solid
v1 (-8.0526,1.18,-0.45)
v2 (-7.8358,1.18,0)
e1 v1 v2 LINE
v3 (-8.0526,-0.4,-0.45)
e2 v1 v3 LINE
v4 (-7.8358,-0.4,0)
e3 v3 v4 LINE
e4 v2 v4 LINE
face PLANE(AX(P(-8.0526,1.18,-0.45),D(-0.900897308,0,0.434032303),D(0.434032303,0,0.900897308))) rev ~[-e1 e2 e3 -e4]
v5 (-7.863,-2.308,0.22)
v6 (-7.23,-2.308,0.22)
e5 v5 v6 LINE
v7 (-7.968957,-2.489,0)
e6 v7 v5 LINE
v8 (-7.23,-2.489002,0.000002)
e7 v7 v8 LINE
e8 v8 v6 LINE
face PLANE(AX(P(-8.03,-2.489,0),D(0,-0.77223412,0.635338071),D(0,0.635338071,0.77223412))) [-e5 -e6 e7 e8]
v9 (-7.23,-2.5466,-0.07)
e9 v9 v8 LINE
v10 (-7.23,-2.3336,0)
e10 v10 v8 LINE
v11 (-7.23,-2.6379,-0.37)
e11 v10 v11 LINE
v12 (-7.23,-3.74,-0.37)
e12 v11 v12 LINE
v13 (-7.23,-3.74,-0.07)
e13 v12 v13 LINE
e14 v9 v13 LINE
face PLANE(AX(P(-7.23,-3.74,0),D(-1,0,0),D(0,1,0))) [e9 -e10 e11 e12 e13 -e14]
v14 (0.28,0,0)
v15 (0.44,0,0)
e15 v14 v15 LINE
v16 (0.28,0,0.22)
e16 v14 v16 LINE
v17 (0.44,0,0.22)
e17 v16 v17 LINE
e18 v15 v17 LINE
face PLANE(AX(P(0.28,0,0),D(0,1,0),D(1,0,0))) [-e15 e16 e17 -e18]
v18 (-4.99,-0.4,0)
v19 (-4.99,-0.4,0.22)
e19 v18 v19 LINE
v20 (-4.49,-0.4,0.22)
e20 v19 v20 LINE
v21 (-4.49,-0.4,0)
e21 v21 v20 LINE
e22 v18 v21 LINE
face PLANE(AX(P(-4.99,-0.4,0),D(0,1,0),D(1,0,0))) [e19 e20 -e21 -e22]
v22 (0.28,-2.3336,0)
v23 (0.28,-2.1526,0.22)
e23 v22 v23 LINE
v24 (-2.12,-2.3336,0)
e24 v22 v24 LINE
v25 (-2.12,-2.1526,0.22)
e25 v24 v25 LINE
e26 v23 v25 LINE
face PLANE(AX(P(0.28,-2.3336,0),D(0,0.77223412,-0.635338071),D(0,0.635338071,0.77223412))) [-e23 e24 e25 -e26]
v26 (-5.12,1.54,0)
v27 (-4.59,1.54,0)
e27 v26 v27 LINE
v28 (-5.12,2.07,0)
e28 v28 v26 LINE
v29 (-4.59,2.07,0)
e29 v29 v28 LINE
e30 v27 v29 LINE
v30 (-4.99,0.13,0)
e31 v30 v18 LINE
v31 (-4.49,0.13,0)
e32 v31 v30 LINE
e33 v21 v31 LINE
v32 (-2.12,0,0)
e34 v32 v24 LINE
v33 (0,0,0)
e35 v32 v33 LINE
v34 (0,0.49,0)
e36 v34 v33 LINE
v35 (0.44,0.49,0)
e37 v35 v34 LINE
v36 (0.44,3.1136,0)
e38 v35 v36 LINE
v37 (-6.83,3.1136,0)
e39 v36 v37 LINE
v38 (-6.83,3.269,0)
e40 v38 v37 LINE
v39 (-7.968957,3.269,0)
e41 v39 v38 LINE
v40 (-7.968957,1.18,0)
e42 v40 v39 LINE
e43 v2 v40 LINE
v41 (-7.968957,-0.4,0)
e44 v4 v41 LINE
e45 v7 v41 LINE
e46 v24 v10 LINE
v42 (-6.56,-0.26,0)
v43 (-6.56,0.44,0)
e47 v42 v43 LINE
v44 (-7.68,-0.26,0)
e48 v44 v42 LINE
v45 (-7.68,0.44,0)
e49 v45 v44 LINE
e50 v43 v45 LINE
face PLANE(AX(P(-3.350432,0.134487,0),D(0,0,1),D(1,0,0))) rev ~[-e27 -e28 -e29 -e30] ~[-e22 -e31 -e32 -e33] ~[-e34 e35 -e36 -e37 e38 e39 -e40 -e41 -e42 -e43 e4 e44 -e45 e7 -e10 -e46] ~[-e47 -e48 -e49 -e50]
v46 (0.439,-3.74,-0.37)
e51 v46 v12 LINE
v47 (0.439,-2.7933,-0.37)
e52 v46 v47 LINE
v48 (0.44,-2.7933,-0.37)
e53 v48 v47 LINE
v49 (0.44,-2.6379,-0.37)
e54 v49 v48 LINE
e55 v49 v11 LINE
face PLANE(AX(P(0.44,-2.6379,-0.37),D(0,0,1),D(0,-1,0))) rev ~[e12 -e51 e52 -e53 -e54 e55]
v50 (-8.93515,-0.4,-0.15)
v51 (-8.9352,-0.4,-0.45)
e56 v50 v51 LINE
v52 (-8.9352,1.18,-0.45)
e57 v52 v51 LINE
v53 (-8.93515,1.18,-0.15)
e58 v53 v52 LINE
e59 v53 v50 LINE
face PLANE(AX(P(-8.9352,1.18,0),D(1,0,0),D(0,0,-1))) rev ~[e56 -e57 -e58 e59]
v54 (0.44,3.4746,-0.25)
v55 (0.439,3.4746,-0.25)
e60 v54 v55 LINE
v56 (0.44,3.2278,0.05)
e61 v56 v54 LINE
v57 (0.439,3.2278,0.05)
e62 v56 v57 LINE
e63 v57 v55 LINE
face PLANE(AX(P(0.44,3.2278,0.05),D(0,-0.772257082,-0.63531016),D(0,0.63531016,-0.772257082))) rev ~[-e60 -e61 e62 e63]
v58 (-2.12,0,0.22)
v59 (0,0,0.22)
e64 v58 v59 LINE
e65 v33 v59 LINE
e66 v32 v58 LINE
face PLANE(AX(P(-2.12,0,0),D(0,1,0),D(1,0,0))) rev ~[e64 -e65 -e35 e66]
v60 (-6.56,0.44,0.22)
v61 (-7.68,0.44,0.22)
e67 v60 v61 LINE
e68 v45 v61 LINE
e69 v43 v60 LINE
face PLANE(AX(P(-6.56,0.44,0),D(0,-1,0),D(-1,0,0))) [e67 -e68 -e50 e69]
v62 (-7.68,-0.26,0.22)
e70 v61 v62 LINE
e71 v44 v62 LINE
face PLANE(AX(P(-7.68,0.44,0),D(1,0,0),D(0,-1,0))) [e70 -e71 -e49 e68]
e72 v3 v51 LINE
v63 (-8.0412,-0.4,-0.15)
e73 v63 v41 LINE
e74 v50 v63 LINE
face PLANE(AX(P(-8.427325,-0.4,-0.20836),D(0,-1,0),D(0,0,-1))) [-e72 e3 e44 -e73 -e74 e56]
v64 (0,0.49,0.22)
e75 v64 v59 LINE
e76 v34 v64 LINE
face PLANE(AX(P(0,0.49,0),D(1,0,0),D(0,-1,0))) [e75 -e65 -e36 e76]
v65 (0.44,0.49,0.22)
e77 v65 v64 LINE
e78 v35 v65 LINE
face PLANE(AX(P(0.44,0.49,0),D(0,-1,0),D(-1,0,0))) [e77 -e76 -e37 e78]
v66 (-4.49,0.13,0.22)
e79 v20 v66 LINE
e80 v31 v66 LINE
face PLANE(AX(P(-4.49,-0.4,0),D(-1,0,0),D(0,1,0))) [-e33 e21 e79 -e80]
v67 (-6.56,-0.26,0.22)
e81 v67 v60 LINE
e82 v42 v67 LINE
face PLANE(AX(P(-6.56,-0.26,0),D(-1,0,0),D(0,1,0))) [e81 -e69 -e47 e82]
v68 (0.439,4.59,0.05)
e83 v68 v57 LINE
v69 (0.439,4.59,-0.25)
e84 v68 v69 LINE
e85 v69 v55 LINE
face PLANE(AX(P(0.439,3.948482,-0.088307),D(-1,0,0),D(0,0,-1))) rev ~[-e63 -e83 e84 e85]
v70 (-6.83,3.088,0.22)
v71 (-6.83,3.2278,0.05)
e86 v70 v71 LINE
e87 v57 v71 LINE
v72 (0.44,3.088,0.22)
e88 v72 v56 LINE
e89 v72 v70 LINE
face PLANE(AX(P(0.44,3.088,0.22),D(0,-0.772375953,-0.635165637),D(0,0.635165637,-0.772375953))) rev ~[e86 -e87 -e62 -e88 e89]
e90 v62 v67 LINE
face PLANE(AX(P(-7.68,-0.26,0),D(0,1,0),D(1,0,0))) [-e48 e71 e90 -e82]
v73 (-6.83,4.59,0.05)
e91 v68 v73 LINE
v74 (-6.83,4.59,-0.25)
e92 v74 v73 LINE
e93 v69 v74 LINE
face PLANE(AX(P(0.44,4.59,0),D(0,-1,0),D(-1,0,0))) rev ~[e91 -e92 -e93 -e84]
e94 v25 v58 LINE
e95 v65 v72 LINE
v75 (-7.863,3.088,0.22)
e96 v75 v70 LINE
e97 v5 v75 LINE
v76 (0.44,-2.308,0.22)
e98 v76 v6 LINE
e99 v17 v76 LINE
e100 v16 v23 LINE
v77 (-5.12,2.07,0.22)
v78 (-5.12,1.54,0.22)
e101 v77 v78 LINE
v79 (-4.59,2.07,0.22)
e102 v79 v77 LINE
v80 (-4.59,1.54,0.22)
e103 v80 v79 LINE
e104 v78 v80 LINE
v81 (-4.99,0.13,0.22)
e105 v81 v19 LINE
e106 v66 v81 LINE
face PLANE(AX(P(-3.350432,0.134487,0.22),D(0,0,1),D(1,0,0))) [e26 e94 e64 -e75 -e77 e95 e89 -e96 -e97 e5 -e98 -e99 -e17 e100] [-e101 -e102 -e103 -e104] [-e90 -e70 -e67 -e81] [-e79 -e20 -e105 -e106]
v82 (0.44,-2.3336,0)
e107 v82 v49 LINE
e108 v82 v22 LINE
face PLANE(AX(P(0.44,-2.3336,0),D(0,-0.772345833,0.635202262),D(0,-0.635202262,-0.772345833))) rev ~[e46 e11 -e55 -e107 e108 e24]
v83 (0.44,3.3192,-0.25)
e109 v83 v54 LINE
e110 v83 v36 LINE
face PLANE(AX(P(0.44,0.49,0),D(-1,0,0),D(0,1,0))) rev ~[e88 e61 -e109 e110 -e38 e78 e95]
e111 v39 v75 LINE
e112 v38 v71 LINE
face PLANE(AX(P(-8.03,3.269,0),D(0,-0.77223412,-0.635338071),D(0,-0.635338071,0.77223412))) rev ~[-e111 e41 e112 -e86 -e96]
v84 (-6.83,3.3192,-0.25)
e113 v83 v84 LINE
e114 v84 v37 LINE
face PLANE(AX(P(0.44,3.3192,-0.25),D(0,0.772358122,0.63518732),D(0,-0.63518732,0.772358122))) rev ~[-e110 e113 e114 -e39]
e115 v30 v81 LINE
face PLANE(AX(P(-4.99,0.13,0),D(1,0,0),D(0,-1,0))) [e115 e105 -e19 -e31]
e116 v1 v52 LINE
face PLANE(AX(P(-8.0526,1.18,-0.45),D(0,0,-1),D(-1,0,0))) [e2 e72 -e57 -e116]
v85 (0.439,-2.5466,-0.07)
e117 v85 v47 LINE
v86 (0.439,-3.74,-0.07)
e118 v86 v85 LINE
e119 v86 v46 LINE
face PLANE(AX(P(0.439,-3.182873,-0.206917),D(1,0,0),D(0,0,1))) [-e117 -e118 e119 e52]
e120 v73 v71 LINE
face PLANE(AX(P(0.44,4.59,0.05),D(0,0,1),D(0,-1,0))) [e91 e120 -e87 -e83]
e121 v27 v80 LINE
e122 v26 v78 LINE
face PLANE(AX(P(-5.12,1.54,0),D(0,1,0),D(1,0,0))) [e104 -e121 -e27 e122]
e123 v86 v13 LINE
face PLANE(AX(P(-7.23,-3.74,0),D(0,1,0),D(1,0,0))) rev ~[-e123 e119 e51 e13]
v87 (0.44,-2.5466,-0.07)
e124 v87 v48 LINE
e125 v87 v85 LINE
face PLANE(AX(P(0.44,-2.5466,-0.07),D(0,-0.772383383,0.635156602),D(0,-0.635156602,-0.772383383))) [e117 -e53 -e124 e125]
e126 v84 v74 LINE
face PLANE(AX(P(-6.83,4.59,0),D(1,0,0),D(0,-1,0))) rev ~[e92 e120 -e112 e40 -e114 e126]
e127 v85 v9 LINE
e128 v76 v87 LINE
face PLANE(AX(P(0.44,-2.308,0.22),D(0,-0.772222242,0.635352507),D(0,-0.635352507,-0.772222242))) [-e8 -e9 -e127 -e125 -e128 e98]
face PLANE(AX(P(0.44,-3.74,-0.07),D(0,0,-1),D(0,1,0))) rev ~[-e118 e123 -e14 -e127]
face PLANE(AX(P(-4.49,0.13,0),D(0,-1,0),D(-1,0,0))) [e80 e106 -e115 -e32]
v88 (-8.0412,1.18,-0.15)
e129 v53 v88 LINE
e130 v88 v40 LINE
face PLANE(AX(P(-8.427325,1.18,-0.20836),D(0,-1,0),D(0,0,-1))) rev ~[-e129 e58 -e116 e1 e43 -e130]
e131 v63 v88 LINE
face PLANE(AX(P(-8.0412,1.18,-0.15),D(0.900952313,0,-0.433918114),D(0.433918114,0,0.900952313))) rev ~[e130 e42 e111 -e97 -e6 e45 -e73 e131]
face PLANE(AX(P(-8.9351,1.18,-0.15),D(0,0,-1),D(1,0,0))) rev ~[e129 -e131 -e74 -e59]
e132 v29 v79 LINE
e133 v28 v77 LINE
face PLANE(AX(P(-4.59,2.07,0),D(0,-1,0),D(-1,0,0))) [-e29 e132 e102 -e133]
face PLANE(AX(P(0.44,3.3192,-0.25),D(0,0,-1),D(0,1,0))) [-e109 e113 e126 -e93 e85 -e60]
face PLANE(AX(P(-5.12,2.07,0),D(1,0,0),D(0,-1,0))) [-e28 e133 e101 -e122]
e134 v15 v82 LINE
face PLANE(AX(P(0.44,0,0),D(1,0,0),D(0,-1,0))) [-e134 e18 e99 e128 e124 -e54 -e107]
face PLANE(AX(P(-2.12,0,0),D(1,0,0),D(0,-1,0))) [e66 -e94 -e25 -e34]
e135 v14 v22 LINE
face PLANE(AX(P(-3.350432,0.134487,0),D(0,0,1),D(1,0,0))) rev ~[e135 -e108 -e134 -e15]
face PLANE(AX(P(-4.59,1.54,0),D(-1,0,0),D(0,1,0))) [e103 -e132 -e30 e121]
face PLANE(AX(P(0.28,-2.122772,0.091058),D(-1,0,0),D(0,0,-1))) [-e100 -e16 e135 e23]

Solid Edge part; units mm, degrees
sketch "Sketch1" plane through (0, 0, 0) normal (0, 0, 1) x (1, 0, 0)
  line L0 (-5.12, 2.07) -> (-5.12, 1.54)
  line L1 (-5.12, 1.54) -> (-4.59, 1.54)
  line L2 (-4.59, 1.54) -> (-4.59, 2.07)
  line L3 (-4.59, 2.07) -> (-5.12, 2.07)
  line L4 (-4.49, 0.13) -> (-4.99, 0.13)
  line L5 (-4.99, 0.13) -> (-4.99, -0.4)
  line L6 (-4.99, -0.4) -> (-4.49, -0.4)
  line L7 (-4.49, -0.4) -> (-4.49, 0.13)
  line L8 (-7.68, -0.26) -> (-6.56, -0.26)
  line L9 (-6.56, -0.26) -> (-6.56, 0.44)
  line L10 (-6.56, 0.44) -> (-7.68, 0.44)
  line L11 (-7.68, 0.44) -> (-7.68, -0.26)
  line L12 (0.44, 0.49) -> (0.44, 4.59)
  line L13 (0.44, 4.59) -> (-6.83, 4.59)
  line L14 (-6.83, 4.59) -> (-6.83, 2.9)
  line L15 (-6.83, 2.9) -> (-8.03, 2.9)
  line L16 (-8.03, 1.18) -> (-8.03, 2.9)
  line L17 (-8.03, 1.18) -> (-8.9351, 1.18)
  line L18 (-8.9351, 1.18) -> (-8.9351, -0.4)
  line L19 (-8.9351, -0.4) -> (-8.03, -0.4)
  line L20 (-8.03, -1.97) -> (-8.03, -0.4)
  line L21 (-8.03, -1.97) -> (-7.23, -1.97)
  line L22 (-7.23, -3.74) -> (-7.23, -1.97)
  line L23 (-7.23, -3.74) -> (0.44, -3.74)
  line L24 (0.44, 0) -> (0.44, -3.74)
  line L25 (0.28, 0) -> (0.44, 0)
  line L26 (0.28, -1.97) -> (0.28, 0)
  line L27 (-2.12, -1.97) -> (0.28, -1.97)
  line L28 (-2.12, 0) -> (-2.12, -1.97)
  line L29 (-2.12, 0) -> (0, 0)
  line L30 (0, 0.49) -> (0, 0)
  line L31 (0.44, 0.49) -> (0, 0.49)
  dimension "D1" = 1.97
  dimension "D2" = 2.9
  dimension "D3" = 2.4
  dimension "D4" = 0.7
  dimension "D5" = 1.12
  dimension "D6" = 0.02
  dimension "D7" = 0.85
extrude "Protrusion1" add sketch "Sketch1" along normal blind 0.22
sketch "Sketch2" plane through (0.44, -1.78, 0.11) normal (1, 0, 0) x (0, 1, 0)
  line L0 (-0.5536, -0.11) -> (-0.8579, -0.48)
  line L1 (-0.8579, -0.48) -> (-1.96, -0.48)
  line L2 (-1.96, -0.48) -> (-1.96, -0.11)
  line L3 (-0.5536, -0.11) -> (-1.96, -0.11)
extrude "Protrusion2" add sketch "Sketch2" against normal up to surface (7.67 mm away)
sketch "Sketch3" plane through (0.44, -1.78, -0.075) normal (1, 0, 0) x (0, 1, 0)
  line L0 (-1.96, 0.005) -> (-0.7666, 0.005)
  line L1 (-0.528, 0.295) -> (-0.7666, 0.005)
  line L2 (-1.96, 0.295) -> (-0.528, 0.295)
  line L3 (-1.96, 0.005) -> (-1.96, 0.295)
  dimension "D1" = 0.3
extrude "Cutout1" cut sketch "Sketch3" against normal through all
sketch "Sketch4" plane through (0.44, 2.54, 0.11) normal (1, 0, 0) x (0, 1, 0)
  line L0 (0.7792, -0.36) -> (0.5736, -0.11)
  line L1 (0.5736, -0.11) -> (2.05, -0.11)
  line L2 (2.05, -0.11) -> (2.05, -0.36)
  line L3 (0.7792, -0.36) -> (2.05, -0.36)
  dimension "D1" = 0.25
extrude "Protrusion3" add sketch "Sketch4" against normal up to surface (7.27 mm away)
sketch "Sketch5" plane through (0.44, 2.54, -0.015) normal (1, 0, 0) x (0, 1, 0)
  line L0 (0.548, 0.235) -> (2.05, 0.235)
  line L1 (2.05, 0.235) -> (2.05, 0.065)
  line L2 (2.05, 0.065) -> (0.6878, 0.065)
  line L3 (0.548, 0.235) -> (0.6878, 0.065)
  dimension "D1" = 0.3
extrude "Cutout2" cut sketch "Sketch5" against normal through all
sketch "Sketch6" plane through (-8.4826, 1.18, 0.11) normal (0, 1, 0) x (-1, 0, 0)
  line L0 (-0.43, -0.56) -> (-0.6468, -0.11)
  line L1 (-0.6468, -0.11) -> (0.4526, -0.11)
  line L2 (0.4526, -0.11) -> (0.4526, -0.56)
  line L3 (-0.43, -0.56) -> (0.4526, -0.56)
  dimension "D1" = 0.45
extrude "Protrusion4" add sketch "Sketch6" against normal up to surface (1.58 mm away)
sketch "Sketch7" plane through (-8.03, 2.04, 0.11) normal (-1, 0, 0) x (0, -1, 0)
  line L0 (-0.86, 0.11) -> (-0.86, -0.11)
  line L1 (-0.86, -0.11) -> (-1.229, -0.11)
  line L2 (-1.229, -0.11) -> (-1.048, 0.11)
  line L3 (-1.048, 0.11) -> (-0.86, 0.11)
  line L4 (4.01, 0.11) -> (4.01, -0.11)
  line L5 (4.529, -0.11) -> (4.01, -0.11)
  line L6 (4.529, -0.11) -> (4.348, 0.11)
  line L7 (4.01, 0.11) -> (4.348, 0.11)
extrude "Protrusion5" add sketch "Sketch7" against normal up to last
sketch "Sketch8" plane through (-8.4825, 1.18, -0.115) normal (0, 1, 0) x (-1, 0, 0)
  line L0 (-0.6195, 0.335) -> (0.4526, 0.335)
  line L1 (0.4526, 0.335) -> (0.4526, -0.035)
  line L2 (0.4526, -0.035) -> (-0.4413, -0.035)
  line L3 (-0.4413, -0.035) -> (-0.6195, 0.335)
  dimension "D1" = 0.3
extrude "Cutout3" cut sketch "Sketch8" along normal through all and the other way through all
sketch "Sketch9" plane through (0.28, -1.05, 0.11) normal (-1, 0, 0) x (0, 1, 0)
  line L0 (-0.92, -0.11) -> (-0.92, 0.11)
  line L1 (-0.92, 0.11) -> (-1.2836, 0.11)
  line L2 (-1.2836, 0.11) -> (-1.1026, -0.11)
  line L3 (-0.92, -0.11) -> (-1.1026, -0.11)
extrude "Cutout4" cut sketch "Sketch9" along normal up to surface (2.4 mm away)
sketch "Sketch10" plane through (0.44, 2.54, -0.015) normal (1, 0, 0) x (0, 1, 0)
  line L0 (2.05, 0.065) -> (2.05, -0.235)
  line L1 (2.05, -0.235) -> (0.9346, -0.235)
  line L2 (0.6878, 0.065) -> (0.9346, -0.235)
  line L3 (2.05, 0.065) -> (0.6878, 0.065)
  line L4 (-6.28, -0.355) -> (-5.3333, -0.355)
  line L5 (-5.0866, -0.055) -> (-5.3333, -0.355)
  line L6 (-6.28, -0.055) -> (-5.0866, -0.055)
  line L7 (-6.28, -0.055) -> (-6.28, -0.355)
extrude "Ausschnitt_7" cut sketch "Sketch10" against normal blind 0.001
